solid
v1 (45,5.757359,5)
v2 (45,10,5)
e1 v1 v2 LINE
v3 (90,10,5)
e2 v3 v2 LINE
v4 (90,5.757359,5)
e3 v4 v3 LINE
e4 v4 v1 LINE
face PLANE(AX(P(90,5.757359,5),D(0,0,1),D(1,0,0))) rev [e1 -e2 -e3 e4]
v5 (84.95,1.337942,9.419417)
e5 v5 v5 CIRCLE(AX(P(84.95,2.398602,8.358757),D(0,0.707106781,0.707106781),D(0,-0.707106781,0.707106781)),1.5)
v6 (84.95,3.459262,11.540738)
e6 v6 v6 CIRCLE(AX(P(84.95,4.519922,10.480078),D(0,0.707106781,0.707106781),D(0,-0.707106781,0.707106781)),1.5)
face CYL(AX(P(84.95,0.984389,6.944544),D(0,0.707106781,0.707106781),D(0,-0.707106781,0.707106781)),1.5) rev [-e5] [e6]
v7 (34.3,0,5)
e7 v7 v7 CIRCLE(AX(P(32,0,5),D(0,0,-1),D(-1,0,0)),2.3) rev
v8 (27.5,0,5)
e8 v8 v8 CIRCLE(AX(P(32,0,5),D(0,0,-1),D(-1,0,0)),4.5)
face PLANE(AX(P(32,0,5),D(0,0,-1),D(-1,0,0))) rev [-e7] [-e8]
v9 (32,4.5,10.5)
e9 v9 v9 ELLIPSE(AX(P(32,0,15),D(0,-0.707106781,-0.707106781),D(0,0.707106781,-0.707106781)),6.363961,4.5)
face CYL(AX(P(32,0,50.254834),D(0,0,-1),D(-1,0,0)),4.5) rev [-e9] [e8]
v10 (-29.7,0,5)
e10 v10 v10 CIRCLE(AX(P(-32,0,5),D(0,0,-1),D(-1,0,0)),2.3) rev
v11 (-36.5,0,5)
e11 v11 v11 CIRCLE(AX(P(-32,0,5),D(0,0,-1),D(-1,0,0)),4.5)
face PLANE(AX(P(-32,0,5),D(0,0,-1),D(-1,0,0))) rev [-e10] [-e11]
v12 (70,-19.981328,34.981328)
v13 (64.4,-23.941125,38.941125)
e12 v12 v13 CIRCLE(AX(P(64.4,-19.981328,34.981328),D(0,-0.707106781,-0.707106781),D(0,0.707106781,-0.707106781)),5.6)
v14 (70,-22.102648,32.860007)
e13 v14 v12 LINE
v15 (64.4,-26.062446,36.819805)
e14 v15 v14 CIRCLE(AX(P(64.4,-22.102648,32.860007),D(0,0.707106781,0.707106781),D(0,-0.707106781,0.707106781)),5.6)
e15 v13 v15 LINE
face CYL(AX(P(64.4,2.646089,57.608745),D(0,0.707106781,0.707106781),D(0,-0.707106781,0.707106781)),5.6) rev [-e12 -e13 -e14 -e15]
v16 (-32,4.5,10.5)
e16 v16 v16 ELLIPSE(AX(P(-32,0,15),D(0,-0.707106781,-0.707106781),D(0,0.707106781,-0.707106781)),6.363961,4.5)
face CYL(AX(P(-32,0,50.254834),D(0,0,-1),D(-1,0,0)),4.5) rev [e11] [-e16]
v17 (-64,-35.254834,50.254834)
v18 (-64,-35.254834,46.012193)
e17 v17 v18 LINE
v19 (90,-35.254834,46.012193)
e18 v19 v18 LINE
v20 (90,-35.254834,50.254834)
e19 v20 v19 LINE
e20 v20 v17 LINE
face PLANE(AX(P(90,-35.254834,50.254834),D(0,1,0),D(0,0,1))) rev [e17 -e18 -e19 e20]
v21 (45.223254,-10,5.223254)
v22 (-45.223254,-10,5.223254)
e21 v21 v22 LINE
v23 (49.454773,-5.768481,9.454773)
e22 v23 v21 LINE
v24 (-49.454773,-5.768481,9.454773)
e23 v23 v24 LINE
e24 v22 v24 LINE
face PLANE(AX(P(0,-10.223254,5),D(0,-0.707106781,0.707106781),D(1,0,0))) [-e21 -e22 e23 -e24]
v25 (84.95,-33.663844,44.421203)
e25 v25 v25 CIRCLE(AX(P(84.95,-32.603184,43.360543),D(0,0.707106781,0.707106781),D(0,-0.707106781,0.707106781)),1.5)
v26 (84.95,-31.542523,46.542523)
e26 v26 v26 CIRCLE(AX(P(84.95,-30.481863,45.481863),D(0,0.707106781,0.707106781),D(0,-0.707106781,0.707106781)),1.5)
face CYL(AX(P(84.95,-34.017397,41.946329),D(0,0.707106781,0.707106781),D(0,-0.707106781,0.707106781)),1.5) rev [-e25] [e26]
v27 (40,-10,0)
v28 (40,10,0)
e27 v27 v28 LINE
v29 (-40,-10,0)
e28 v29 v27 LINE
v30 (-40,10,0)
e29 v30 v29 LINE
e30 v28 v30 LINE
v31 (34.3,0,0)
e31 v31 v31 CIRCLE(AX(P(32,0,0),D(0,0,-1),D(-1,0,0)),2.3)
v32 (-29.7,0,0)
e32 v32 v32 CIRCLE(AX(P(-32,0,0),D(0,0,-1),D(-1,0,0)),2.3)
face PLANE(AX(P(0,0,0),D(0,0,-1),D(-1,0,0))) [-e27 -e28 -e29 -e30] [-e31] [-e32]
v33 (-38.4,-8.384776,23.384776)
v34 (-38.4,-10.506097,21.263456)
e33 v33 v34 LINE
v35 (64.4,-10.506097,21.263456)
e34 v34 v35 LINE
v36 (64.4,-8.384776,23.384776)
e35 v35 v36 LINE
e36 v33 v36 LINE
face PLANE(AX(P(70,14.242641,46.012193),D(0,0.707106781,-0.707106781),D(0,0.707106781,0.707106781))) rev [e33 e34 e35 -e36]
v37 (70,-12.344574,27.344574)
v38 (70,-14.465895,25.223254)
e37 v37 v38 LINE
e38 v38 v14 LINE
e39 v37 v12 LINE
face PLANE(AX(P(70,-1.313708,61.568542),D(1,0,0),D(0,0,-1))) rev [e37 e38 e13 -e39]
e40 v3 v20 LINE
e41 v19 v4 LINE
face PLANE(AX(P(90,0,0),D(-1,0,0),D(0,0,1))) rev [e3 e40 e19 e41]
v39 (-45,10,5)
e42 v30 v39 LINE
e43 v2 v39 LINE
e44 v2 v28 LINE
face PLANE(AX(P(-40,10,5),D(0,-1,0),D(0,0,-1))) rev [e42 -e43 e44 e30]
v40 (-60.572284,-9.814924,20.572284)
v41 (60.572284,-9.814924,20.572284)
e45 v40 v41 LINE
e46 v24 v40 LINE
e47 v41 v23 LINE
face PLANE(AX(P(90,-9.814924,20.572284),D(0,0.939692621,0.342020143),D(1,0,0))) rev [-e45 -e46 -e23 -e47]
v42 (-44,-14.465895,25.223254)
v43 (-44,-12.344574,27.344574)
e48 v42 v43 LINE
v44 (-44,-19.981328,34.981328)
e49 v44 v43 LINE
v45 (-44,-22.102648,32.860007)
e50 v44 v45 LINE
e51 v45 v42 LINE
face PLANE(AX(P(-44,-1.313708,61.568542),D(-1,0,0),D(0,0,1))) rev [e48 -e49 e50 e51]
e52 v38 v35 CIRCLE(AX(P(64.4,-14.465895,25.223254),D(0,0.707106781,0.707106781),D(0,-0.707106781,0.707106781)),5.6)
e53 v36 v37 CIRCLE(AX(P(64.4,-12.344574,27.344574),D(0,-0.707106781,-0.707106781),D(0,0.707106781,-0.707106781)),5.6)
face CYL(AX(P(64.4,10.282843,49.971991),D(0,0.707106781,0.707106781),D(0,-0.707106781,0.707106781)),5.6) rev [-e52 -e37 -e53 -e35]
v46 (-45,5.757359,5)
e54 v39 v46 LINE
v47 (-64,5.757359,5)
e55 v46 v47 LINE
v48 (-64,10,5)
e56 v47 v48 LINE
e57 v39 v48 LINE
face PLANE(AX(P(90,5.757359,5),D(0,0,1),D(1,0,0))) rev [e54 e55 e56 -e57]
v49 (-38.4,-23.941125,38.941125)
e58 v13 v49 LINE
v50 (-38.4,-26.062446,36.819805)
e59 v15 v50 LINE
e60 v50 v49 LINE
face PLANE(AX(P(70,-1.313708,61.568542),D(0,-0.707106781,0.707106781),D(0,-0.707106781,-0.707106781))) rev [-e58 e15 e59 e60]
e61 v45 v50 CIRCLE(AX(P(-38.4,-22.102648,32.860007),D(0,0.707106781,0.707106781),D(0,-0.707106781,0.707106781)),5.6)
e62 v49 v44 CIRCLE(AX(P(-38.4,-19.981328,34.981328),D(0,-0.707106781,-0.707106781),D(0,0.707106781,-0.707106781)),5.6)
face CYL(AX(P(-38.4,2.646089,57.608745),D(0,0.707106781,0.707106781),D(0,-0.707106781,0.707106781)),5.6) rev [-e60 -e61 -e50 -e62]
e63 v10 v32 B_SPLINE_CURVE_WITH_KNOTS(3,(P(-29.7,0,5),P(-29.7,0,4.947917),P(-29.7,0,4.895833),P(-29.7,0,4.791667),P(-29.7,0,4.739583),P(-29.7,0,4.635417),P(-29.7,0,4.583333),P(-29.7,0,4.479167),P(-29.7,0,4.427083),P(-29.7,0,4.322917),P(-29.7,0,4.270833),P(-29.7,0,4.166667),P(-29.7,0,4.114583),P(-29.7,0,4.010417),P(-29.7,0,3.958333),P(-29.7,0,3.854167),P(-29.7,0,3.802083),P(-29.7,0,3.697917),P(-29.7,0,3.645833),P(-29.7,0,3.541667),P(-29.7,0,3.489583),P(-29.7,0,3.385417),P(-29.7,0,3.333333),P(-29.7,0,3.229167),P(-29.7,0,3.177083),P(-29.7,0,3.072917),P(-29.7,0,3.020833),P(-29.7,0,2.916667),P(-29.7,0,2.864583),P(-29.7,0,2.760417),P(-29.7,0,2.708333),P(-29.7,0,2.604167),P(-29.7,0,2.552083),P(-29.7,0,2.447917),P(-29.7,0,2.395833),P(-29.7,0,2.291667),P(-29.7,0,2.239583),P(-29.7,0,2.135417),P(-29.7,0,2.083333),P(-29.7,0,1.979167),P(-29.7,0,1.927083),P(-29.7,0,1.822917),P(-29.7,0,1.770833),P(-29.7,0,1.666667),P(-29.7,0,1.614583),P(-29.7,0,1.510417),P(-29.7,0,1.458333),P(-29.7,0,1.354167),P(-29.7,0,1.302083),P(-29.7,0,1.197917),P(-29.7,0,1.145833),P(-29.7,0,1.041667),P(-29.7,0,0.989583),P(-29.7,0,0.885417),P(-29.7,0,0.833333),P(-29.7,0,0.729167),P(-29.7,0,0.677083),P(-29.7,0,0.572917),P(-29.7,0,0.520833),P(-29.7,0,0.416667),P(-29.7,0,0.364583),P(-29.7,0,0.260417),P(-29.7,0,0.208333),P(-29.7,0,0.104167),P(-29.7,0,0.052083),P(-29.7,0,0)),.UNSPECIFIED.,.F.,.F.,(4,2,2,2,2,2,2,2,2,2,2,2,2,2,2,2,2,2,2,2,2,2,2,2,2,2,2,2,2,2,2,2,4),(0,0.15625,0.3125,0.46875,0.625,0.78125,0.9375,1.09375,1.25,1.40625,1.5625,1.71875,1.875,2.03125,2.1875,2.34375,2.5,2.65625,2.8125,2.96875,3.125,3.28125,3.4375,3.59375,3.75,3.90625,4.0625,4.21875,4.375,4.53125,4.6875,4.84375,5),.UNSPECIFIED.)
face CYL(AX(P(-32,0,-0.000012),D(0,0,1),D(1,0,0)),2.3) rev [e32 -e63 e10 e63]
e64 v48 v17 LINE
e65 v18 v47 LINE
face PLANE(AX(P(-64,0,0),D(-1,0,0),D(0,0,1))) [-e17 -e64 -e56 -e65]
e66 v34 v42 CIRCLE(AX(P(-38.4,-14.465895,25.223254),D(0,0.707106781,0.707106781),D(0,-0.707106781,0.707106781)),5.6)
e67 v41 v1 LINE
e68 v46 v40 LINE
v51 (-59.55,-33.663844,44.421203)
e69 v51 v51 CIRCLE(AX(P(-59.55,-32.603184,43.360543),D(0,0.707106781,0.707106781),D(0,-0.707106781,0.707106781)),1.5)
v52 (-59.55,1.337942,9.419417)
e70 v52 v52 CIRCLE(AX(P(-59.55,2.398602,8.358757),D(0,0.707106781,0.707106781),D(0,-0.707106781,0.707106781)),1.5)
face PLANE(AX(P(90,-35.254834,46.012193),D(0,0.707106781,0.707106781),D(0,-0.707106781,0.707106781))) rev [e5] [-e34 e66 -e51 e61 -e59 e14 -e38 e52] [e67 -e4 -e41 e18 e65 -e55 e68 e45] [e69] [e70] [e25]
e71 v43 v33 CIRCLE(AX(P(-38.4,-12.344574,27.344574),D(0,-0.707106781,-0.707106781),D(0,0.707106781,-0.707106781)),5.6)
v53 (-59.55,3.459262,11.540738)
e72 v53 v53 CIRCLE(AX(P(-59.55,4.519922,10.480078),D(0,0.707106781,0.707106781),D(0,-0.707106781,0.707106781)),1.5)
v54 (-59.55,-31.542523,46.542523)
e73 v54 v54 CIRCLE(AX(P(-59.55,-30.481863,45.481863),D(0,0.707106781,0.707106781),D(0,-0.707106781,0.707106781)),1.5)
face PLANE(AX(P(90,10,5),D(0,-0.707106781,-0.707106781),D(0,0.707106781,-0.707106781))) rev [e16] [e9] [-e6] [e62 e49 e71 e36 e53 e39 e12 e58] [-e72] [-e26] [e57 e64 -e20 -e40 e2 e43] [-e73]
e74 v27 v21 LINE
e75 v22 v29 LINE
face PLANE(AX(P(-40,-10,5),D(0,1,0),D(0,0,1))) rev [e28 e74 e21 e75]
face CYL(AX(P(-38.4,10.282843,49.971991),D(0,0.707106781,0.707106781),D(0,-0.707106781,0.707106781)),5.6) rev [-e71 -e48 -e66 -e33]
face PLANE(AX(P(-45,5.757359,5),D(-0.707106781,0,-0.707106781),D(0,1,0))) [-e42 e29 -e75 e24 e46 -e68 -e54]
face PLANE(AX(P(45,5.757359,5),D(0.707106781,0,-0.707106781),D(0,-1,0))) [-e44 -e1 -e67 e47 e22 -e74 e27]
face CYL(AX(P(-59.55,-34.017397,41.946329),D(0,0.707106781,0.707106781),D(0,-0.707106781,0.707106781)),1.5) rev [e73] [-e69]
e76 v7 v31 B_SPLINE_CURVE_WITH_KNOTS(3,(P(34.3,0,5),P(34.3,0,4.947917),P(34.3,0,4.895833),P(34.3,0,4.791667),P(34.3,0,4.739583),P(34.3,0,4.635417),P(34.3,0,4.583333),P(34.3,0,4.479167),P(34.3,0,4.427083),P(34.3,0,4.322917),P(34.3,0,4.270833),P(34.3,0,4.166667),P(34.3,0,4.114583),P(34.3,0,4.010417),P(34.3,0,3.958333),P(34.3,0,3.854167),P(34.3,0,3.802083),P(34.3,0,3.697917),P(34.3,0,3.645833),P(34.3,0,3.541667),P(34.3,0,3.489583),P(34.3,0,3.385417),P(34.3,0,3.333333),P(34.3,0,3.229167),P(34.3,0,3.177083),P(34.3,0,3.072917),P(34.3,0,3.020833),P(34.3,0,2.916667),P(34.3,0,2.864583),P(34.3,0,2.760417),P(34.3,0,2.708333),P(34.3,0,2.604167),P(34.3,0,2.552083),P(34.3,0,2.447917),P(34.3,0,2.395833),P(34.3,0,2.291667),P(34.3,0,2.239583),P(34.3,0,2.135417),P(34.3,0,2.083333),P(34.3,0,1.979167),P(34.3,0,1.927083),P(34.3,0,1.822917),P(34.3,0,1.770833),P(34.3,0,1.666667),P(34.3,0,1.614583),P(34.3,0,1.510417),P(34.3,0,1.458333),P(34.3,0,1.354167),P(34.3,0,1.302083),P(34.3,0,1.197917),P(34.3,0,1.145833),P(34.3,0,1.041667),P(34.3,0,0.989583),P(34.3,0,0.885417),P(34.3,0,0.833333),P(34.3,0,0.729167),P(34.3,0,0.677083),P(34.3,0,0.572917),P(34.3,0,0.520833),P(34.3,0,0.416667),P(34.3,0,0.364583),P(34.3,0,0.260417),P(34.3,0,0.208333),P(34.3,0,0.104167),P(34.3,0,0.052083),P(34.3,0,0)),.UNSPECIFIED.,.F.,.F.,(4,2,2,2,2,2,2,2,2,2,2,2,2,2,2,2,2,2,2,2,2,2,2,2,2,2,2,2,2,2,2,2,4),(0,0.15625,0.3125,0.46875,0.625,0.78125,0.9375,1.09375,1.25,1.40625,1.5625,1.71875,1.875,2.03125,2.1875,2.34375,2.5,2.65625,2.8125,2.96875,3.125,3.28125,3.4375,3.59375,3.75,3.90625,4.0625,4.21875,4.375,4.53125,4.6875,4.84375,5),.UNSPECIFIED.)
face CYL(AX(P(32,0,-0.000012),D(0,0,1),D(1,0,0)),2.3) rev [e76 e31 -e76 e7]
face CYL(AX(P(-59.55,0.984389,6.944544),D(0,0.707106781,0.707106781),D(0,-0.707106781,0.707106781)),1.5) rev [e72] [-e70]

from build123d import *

# Parameters (mm, degrees)
SKETCH1_W                = 80
SKETCH1_H                = 20
BOSS_EXTRUDE1_DEPTH      = 5
BOSS_EXTRUDE2_DEPTH      = 90
BOSS_EXTRUDE2_DEPTH_BACK = 64
SKETCH4_W                = 114
SKETCH4_H                = 22
CUT_EXTRUDE2_DEPTH       = 109.466361883
CHAMFER2_SIZE            = 11.3
CHAMFER2_SIZE_2          = 15.980613255
CHAMFER4_SIZE            = 5
CHAMFER4_SIZE2           = 10.722534603
CUT_EXTRUDE1_DEPTH       = 109.942423601
CUT_EXTRUDE1_DEPTH_BACK  = 109.942423601
SKETCH2_R                = 2.3
SKETCH5_R                = 4.5
CUT_EXTRUDE3_DEPTH       = 107.728174912
SKETCH6_R                = 1.5
CUT_EXTRUDE4_DEPTH       = 5
FILLET2_R                = 5.6


with BuildPart() as part:
    # Sketch1 → Boss-Extrude1 (new body)
    with BuildSketch(Plane.XY):
        Rectangle(SKETCH1_W, SKETCH1_H)
    extrude(amount=BOSS_EXTRUDE1_DEPTH)

    # Sketch3 → Boss-Extrude2 (add, two sides: drawn at the far end of the back side and taken through both)
    with BuildSketch(Plane(origin=(0, 0, 0), x_dir=(0, 0, -1), z_dir=(1, 0, 0)).offset(-BOSS_EXTRUDE2_DEPTH_BACK)):
        Polygon((-5, 10), (-50.254833996, -35.254833996), (-46.012193309, -35.254833996), (-5, 5.757359313), align=None)
    extrude(amount=BOSS_EXTRUDE2_DEPTH + BOSS_EXTRUDE2_DEPTH_BACK)

    # Sketch4 → Cut-Extrude2 (cut, through all)
    with BuildSketch(Plane(origin=(0, 5.378679656, 5.378679656), x_dir=(1, 0, 0), z_dir=(0, -0.7071067811865509, -0.7071067811865441))):
        with Locations((13, 33.464466094)):
            Rectangle(SKETCH4_W, SKETCH4_H)
    extrude(amount=-CUT_EXTRUDE2_DEPTH, mode=Mode.SUBTRACT)

    # Chamfer1
    # the kernel refuses this chamfer: 5 mm, written as the material it adds along each edge
    with BuildSketch(Plane(origin=(40, -25.102836543, 5), x_dir=(-0.027495876610586317, 0, -0.9996219169112968), z_dir=(0, 1, 0))) as chamfer1_piece_1_section:
        with BuildLine():
            Line((5.143365976, 0), (-0.282735774, -5.135588968))
            Line((-0.282735774, -5.135588968), (-0.382697966, -5.13283938))
            ThreePointArc((-0.382697966, -5.13283938), (-0.170646135, -2.566989148), (-0.099962192, 0.002749588))
            Line((-0.099962192, 0.002749588), (0.002749588, 0.099962192))
            ThreePointArc((0.002749588, 0.099962192), (2.572488324, 0.029278248), (5.146115564, 0.099962192))
            Line((5.146115564, 0.099962192), (5.143365976, 0))
        make_face()
    chamfer1_piece_1 = extrude(amount=35.102836543, mode=Mode.PRIVATE)
    chamfer1_piece_1 = split(chamfer1_piece_1, bisect_by=Plane(origin=(41.544288895, -10, 3.190389103), z_dir=(0, 1, 0)), keep=Keep.TOP, mode=Mode.PRIVATE)
    chamfer1_piece_1 = split(chamfer1_piece_1, bisect_by=Plane(origin=(41.544288895, -1.222319508, 0), z_dir=(0, 0, 1)), keep=Keep.TOP, mode=Mode.PRIVATE)
    chamfer1_piece_1 = split(chamfer1_piece_1, bisect_by=Plane(origin=(41.544288895, -1.222319508, 5), z_dir=(0, 0, -1)), keep=Keep.TOP, mode=Mode.PRIVATE)
    chamfer1_piece_1 = split(chamfer1_piece_1, bisect_by=Plane(origin=(41.544288895, 3.172325351, 7.585033962), z_dir=(0, -0.7071067811865511, -0.707106781186544)), keep=Keep.TOP, mode=Mode.PRIVATE)
    add(chamfer1_piece_1)
    with BuildSketch(Plane(origin=(40, -25.102836543, 5), x_dir=(-0.027495876610586317, 0, -0.9996219169112968), z_dir=(0, 1, 0))) as chamfer1_piece_2_section:
        with BuildLine():
            Line((5.143365976, 0), (-0.282735774, -5.135588968))
            Line((-0.282735774, -5.135588968), (-0.382697966, -5.13283938))
            ThreePointArc((-0.382697966, -5.13283938), (-0.170646135, -2.566989148), (-0.099962192, 0.002749588))
            Line((-0.099962192, 0.002749588), (0.002749588, 0.099962192))
            ThreePointArc((0.002749588, 0.099962192), (2.572488324, 0.029278248), (5.146115564, 0.099962192))
            Line((5.146115564, 0.099962192), (5.143365976, 0))
        make_face()
    chamfer1_piece_2 = extrude(amount=35.102836543, mode=Mode.PRIVATE)
    chamfer1_piece_2 = split(chamfer1_piece_2, bisect_by=Plane(origin=(41.882166071, 8.451075781, 5), z_dir=(0, 0, -1)), keep=Keep.TOP, mode=Mode.PRIVATE)
    chamfer1_piece_2 = split(chamfer1_piece_2, bisect_by=Plane(origin=(41.882166071, 7.676613671, 3.080745642), z_dir=(0, 0.7071067811865511, 0.707106781186544)), keep=Keep.TOP, mode=Mode.PRIVATE)
    add(chamfer1_piece_2)
    with BuildSketch(Plane(origin=(40, -25.102836543, 5), x_dir=(-0.027495876610586317, 0, -0.9996219169112968), z_dir=(0, 1, 0))) as chamfer1_piece_3_section:
        with BuildLine():
            Line((5.143365976, 0), (-0.282735774, -5.135588968))
            Line((-0.282735774, -5.135588968), (-0.382697966, -5.13283938))
            ThreePointArc((-0.382697966, -5.13283938), (-0.170646135, -2.566989148), (-0.099962192, 0.002749588))
            Line((-0.099962192, 0.002749588), (0.002749588, 0.099962192))
            ThreePointArc((0.002749588, 0.099962192), (2.572488324, 0.029278248), (5.146115564, 0.099962192))
            Line((5.146115564, 0.099962192), (5.143365976, 0))
        make_face()
    chamfer1_piece_3 = extrude(amount=35.102836543, mode=Mode.PRIVATE)
    chamfer1_piece_3 = split(chamfer1_piece_3, bisect_by=Plane(origin=(43.003980886, 7.808289703, 5), z_dir=(0, 0, 1)), keep=Keep.TOP, mode=Mode.PRIVATE)
    chamfer1_piece_3 = split(chamfer1_piece_3, bisect_by=Plane(origin=(43.003980886, 6.747629531, 4.009729782), z_dir=(0, 0.7071067811865511, 0.707106781186544)), keep=Keep.TOP, mode=Mode.PRIVATE)
    chamfer1_piece_3 = split(chamfer1_piece_3, bisect_by=Plane(origin=(43.003980886, 8.868949875, 6.131050125), z_dir=(0, -0.7071067811865511, -0.7071067811865439)), keep=Keep.TOP, mode=Mode.PRIVATE)
    add(chamfer1_piece_3)
    with BuildSketch(Plane(origin=(-40, 10, 5), x_dir=(0.027495876610586317, 0, -0.9996219169112968), z_dir=(0, -1, 0))) as chamfer1_piece_4_section:
        with BuildLine():
            Line((5.143365976, 0), (-0.282735774, -5.135588968))
            Line((-0.282735774, -5.135588968), (-0.382697966, -5.13283938))
            ThreePointArc((-0.382697966, -5.13283938), (-0.170646135, -2.566989148), (-0.099962192, 0.002749588))
            Line((-0.099962192, 0.002749588), (0.002749588, 0.099962192))
            ThreePointArc((0.002749588, 0.099962192), (2.572488324, 0.029278248), (5.146115564, 0.099962192))
            Line((5.146115564, 0.099962192), (5.143365976, 0))
        make_face()
    chamfer1_piece_4 = extrude(amount=35.102836543, mode=Mode.PRIVATE)
    chamfer1_piece_4 = split(chamfer1_piece_4, bisect_by=Plane(origin=(-41.882166071, 8.451075781, 5), z_dir=(0, 0, -1)), keep=Keep.TOP, mode=Mode.PRIVATE)
    chamfer1_piece_4 = split(chamfer1_piece_4, bisect_by=Plane(origin=(-41.882166071, 7.676613671, 3.080745642), z_dir=(0, 0.7071067811865511, 0.707106781186544)), keep=Keep.TOP, mode=Mode.PRIVATE)
    add(chamfer1_piece_4)
    with BuildSketch(Plane(origin=(-40, 10, 5), x_dir=(0.027495876610586317, 0, -0.9996219169112968), z_dir=(0, -1, 0))) as chamfer1_piece_5_section:
        with BuildLine():
            Line((5.143365976, 0), (-0.282735774, -5.135588968))
            Line((-0.282735774, -5.135588968), (-0.382697966, -5.13283938))
            ThreePointArc((-0.382697966, -5.13283938), (-0.170646135, -2.566989148), (-0.099962192, 0.002749588))
            Line((-0.099962192, 0.002749588), (0.002749588, 0.099962192))
            ThreePointArc((0.002749588, 0.099962192), (2.572488324, 0.029278248), (5.146115564, 0.099962192))
            Line((5.146115564, 0.099962192), (5.143365976, 0))
        make_face()
    chamfer1_piece_5 = extrude(amount=35.102836543, mode=Mode.PRIVATE)
    chamfer1_piece_5 = split(chamfer1_piece_5, bisect_by=Plane(origin=(-43.003980886, 7.808289703, 5), z_dir=(0, 0, 1)), keep=Keep.TOP, mode=Mode.PRIVATE)
    chamfer1_piece_5 = split(chamfer1_piece_5, bisect_by=Plane(origin=(-43.003980886, 6.747629531, 4.009729782), z_dir=(0, 0.7071067811865511, 0.707106781186544)), keep=Keep.TOP, mode=Mode.PRIVATE)
    chamfer1_piece_5 = split(chamfer1_piece_5, bisect_by=Plane(origin=(-43.003980886, 8.868949875, 6.131050125), z_dir=(0, -0.7071067811865511, -0.7071067811865439)), keep=Keep.TOP, mode=Mode.PRIVATE)
    add(chamfer1_piece_5)
    with BuildSketch(Plane(origin=(-40, 10, 5), x_dir=(0.027495876610586317, 0, -0.9996219169112968), z_dir=(0, -1, 0))) as chamfer1_piece_6_section:
        with BuildLine():
            Line((5.143365976, 0), (-0.282735774, -5.135588968))
            Line((-0.282735774, -5.135588968), (-0.382697966, -5.13283938))
            ThreePointArc((-0.382697966, -5.13283938), (-0.170646135, -2.566989148), (-0.099962192, 0.002749588))
            Line((-0.099962192, 0.002749588), (0.002749588, 0.099962192))
            ThreePointArc((0.002749588, 0.099962192), (2.572488324, 0.029278248), (5.146115564, 0.099962192))
            Line((5.146115564, 0.099962192), (5.143365976, 0))
        make_face()
    chamfer1_piece_6 = extrude(amount=35.102836543, mode=Mode.PRIVATE)
    chamfer1_piece_6 = split(chamfer1_piece_6, bisect_by=Plane(origin=(-41.544288895, -10, 3.190389103), z_dir=(0, 1, 0)), keep=Keep.TOP, mode=Mode.PRIVATE)
    chamfer1_piece_6 = split(chamfer1_piece_6, bisect_by=Plane(origin=(-41.544288895, -1.222319508, 0), z_dir=(0, 0, 1)), keep=Keep.TOP, mode=Mode.PRIVATE)
    chamfer1_piece_6 = split(chamfer1_piece_6, bisect_by=Plane(origin=(-41.544288895, -1.222319508, 5), z_dir=(0, 0, -1)), keep=Keep.TOP, mode=Mode.PRIVATE)
    chamfer1_piece_6 = split(chamfer1_piece_6, bisect_by=Plane(origin=(-41.544288895, 3.172325351, 7.585033962), z_dir=(0, -0.7071067811865511, -0.707106781186544)), keep=Keep.TOP, mode=Mode.PRIVATE)
    add(chamfer1_piece_6)

    # Chamfer2
    # the kernel refuses this chamfer: 15.980613255, 11.3 mm, written as the material it adds along each edge
    with BuildSketch(Plane(origin=(86.097071245, 5.757359313, 5), x_dir=(0, -0.6660419652145876, 0.745914271597675), z_dir=(-1, 0, 0))) as chamfer2_piece_1_section:
        Polygon((CHAMFER2_SIZE * 0.998403829789, -CHAMFER2_SIZE * 0.0564782494725), (CHAMFER2_SIZE_2 * 0.666041965207, -CHAMFER2_SIZE_2 * 0.745914271589), (0, 0), align=None)
    chamfer2_piece_1 = extrude(amount=172.194142489, mode=Mode.PRIVATE)
    chamfer2_piece_1 = split(chamfer2_piece_1, bisect_by=Plane(origin=(-23.869417759, -2.230051689, -16.130582241), z_dir=(0.7071067811862721, 0, 0.707106781186823)), keep=Keep.TOP, mode=Mode.PRIVATE)
    chamfer2_piece_1 = split(chamfer2_piece_1, bisect_by=Plane(origin=(23.869417759, -2.230051689, -16.130582241), z_dir=(-0.7071067811862721, 0, 0.707106781186823)), keep=Keep.TOP, mode=Mode.PRIVATE)
    chamfer2_piece_1 = split(chamfer2_piece_1, bisect_by=Plane(origin=(0, -10, 7.738835518), z_dir=(0, 1, 0)), keep=Keep.TOP, mode=Mode.PRIVATE)
    add(chamfer2_piece_1)

    # Chamfer4
    chamfer4_edges = [part.edges().sort_by_distance(p)[0] for p in [
        (0, -2.232947315, 12.990306627),
    ]]
    chamfer4_side = [part.faces().sort_by_distance(p)[0] for p in [
        (0, -6.014099628, 9.209154314),
    ]]
    chamfer(chamfer4_edges, length=CHAMFER4_SIZE, length2=CHAMFER4_SIZE2, reference=chamfer4_side[0])

    # Sketch2 → Cut-Extrude1 (cut, two sides: drawn at the far end of the back side and taken through both)
    with BuildSketch(Plane.XY.offset(-CUT_EXTRUDE1_DEPTH_BACK)):
        with Locations(Location((-32, 0, 0), (0, 0, 270))):
            Circle(SKETCH2_R)
        with Locations(Location((32, 0, 0), (0, 0, 270))):
            Circle(SKETCH2_R)
    extrude(amount=CUT_EXTRUDE1_DEPTH + CUT_EXTRUDE1_DEPTH_BACK, mode=Mode.SUBTRACT)

    # Sketch5 → Cut-Extrude3 (cut, through all)
    with BuildSketch(Plane(origin=(0, 0, 5), x_dir=(-1, 0, 0), z_dir=(0, 0, -1))):
        with Locations((-32, 0)):
            Circle(SKETCH5_R)
        with Locations((32, 0)):
            Circle(SKETCH5_R)
    extrude(amount=-CUT_EXTRUDE3_DEPTH, mode=Mode.SUBTRACT)

    # Sketch6 → Cut-Extrude4 (cut)
    with BuildSketch(Plane(origin=(0, 7.5, 7.5), x_dir=(1, 0, 0), z_dir=(0, 0.7071067811865511, 0.707106781186544))):
        with Locations(Location((-59.55, -4.214466094, 0), (0, 0, 270))):
            Circle(SKETCH6_R)
        with Locations(Location((-59.55, -53.714466094, 0), (0, 0, 270))):
            Circle(SKETCH6_R)
        with Locations(Location((84.95, -53.714466094, 0), (0, 0, 270))):
            Circle(SKETCH6_R)
        with Locations(Location((84.95, -4.214466094, 0), (0, 0, 270))):
            Circle(SKETCH6_R)
    extrude(amount=-CUT_EXTRUDE4_DEPTH, mode=Mode.SUBTRACT)

    # Fillet2
    fillet2_edges = [part.edges().sort_by_distance(p)[0] for p in [
        (-44, -9.445436483, 22.324116139),
        (-44, -25.001785669, 37.880465325),
        (70, -25.001785669, 37.880465325),
        (70, -9.445436483, 22.324116139),
    ]]
    fillet(fillet2_edges, radius=FILLET2_R)


solid = part.part
